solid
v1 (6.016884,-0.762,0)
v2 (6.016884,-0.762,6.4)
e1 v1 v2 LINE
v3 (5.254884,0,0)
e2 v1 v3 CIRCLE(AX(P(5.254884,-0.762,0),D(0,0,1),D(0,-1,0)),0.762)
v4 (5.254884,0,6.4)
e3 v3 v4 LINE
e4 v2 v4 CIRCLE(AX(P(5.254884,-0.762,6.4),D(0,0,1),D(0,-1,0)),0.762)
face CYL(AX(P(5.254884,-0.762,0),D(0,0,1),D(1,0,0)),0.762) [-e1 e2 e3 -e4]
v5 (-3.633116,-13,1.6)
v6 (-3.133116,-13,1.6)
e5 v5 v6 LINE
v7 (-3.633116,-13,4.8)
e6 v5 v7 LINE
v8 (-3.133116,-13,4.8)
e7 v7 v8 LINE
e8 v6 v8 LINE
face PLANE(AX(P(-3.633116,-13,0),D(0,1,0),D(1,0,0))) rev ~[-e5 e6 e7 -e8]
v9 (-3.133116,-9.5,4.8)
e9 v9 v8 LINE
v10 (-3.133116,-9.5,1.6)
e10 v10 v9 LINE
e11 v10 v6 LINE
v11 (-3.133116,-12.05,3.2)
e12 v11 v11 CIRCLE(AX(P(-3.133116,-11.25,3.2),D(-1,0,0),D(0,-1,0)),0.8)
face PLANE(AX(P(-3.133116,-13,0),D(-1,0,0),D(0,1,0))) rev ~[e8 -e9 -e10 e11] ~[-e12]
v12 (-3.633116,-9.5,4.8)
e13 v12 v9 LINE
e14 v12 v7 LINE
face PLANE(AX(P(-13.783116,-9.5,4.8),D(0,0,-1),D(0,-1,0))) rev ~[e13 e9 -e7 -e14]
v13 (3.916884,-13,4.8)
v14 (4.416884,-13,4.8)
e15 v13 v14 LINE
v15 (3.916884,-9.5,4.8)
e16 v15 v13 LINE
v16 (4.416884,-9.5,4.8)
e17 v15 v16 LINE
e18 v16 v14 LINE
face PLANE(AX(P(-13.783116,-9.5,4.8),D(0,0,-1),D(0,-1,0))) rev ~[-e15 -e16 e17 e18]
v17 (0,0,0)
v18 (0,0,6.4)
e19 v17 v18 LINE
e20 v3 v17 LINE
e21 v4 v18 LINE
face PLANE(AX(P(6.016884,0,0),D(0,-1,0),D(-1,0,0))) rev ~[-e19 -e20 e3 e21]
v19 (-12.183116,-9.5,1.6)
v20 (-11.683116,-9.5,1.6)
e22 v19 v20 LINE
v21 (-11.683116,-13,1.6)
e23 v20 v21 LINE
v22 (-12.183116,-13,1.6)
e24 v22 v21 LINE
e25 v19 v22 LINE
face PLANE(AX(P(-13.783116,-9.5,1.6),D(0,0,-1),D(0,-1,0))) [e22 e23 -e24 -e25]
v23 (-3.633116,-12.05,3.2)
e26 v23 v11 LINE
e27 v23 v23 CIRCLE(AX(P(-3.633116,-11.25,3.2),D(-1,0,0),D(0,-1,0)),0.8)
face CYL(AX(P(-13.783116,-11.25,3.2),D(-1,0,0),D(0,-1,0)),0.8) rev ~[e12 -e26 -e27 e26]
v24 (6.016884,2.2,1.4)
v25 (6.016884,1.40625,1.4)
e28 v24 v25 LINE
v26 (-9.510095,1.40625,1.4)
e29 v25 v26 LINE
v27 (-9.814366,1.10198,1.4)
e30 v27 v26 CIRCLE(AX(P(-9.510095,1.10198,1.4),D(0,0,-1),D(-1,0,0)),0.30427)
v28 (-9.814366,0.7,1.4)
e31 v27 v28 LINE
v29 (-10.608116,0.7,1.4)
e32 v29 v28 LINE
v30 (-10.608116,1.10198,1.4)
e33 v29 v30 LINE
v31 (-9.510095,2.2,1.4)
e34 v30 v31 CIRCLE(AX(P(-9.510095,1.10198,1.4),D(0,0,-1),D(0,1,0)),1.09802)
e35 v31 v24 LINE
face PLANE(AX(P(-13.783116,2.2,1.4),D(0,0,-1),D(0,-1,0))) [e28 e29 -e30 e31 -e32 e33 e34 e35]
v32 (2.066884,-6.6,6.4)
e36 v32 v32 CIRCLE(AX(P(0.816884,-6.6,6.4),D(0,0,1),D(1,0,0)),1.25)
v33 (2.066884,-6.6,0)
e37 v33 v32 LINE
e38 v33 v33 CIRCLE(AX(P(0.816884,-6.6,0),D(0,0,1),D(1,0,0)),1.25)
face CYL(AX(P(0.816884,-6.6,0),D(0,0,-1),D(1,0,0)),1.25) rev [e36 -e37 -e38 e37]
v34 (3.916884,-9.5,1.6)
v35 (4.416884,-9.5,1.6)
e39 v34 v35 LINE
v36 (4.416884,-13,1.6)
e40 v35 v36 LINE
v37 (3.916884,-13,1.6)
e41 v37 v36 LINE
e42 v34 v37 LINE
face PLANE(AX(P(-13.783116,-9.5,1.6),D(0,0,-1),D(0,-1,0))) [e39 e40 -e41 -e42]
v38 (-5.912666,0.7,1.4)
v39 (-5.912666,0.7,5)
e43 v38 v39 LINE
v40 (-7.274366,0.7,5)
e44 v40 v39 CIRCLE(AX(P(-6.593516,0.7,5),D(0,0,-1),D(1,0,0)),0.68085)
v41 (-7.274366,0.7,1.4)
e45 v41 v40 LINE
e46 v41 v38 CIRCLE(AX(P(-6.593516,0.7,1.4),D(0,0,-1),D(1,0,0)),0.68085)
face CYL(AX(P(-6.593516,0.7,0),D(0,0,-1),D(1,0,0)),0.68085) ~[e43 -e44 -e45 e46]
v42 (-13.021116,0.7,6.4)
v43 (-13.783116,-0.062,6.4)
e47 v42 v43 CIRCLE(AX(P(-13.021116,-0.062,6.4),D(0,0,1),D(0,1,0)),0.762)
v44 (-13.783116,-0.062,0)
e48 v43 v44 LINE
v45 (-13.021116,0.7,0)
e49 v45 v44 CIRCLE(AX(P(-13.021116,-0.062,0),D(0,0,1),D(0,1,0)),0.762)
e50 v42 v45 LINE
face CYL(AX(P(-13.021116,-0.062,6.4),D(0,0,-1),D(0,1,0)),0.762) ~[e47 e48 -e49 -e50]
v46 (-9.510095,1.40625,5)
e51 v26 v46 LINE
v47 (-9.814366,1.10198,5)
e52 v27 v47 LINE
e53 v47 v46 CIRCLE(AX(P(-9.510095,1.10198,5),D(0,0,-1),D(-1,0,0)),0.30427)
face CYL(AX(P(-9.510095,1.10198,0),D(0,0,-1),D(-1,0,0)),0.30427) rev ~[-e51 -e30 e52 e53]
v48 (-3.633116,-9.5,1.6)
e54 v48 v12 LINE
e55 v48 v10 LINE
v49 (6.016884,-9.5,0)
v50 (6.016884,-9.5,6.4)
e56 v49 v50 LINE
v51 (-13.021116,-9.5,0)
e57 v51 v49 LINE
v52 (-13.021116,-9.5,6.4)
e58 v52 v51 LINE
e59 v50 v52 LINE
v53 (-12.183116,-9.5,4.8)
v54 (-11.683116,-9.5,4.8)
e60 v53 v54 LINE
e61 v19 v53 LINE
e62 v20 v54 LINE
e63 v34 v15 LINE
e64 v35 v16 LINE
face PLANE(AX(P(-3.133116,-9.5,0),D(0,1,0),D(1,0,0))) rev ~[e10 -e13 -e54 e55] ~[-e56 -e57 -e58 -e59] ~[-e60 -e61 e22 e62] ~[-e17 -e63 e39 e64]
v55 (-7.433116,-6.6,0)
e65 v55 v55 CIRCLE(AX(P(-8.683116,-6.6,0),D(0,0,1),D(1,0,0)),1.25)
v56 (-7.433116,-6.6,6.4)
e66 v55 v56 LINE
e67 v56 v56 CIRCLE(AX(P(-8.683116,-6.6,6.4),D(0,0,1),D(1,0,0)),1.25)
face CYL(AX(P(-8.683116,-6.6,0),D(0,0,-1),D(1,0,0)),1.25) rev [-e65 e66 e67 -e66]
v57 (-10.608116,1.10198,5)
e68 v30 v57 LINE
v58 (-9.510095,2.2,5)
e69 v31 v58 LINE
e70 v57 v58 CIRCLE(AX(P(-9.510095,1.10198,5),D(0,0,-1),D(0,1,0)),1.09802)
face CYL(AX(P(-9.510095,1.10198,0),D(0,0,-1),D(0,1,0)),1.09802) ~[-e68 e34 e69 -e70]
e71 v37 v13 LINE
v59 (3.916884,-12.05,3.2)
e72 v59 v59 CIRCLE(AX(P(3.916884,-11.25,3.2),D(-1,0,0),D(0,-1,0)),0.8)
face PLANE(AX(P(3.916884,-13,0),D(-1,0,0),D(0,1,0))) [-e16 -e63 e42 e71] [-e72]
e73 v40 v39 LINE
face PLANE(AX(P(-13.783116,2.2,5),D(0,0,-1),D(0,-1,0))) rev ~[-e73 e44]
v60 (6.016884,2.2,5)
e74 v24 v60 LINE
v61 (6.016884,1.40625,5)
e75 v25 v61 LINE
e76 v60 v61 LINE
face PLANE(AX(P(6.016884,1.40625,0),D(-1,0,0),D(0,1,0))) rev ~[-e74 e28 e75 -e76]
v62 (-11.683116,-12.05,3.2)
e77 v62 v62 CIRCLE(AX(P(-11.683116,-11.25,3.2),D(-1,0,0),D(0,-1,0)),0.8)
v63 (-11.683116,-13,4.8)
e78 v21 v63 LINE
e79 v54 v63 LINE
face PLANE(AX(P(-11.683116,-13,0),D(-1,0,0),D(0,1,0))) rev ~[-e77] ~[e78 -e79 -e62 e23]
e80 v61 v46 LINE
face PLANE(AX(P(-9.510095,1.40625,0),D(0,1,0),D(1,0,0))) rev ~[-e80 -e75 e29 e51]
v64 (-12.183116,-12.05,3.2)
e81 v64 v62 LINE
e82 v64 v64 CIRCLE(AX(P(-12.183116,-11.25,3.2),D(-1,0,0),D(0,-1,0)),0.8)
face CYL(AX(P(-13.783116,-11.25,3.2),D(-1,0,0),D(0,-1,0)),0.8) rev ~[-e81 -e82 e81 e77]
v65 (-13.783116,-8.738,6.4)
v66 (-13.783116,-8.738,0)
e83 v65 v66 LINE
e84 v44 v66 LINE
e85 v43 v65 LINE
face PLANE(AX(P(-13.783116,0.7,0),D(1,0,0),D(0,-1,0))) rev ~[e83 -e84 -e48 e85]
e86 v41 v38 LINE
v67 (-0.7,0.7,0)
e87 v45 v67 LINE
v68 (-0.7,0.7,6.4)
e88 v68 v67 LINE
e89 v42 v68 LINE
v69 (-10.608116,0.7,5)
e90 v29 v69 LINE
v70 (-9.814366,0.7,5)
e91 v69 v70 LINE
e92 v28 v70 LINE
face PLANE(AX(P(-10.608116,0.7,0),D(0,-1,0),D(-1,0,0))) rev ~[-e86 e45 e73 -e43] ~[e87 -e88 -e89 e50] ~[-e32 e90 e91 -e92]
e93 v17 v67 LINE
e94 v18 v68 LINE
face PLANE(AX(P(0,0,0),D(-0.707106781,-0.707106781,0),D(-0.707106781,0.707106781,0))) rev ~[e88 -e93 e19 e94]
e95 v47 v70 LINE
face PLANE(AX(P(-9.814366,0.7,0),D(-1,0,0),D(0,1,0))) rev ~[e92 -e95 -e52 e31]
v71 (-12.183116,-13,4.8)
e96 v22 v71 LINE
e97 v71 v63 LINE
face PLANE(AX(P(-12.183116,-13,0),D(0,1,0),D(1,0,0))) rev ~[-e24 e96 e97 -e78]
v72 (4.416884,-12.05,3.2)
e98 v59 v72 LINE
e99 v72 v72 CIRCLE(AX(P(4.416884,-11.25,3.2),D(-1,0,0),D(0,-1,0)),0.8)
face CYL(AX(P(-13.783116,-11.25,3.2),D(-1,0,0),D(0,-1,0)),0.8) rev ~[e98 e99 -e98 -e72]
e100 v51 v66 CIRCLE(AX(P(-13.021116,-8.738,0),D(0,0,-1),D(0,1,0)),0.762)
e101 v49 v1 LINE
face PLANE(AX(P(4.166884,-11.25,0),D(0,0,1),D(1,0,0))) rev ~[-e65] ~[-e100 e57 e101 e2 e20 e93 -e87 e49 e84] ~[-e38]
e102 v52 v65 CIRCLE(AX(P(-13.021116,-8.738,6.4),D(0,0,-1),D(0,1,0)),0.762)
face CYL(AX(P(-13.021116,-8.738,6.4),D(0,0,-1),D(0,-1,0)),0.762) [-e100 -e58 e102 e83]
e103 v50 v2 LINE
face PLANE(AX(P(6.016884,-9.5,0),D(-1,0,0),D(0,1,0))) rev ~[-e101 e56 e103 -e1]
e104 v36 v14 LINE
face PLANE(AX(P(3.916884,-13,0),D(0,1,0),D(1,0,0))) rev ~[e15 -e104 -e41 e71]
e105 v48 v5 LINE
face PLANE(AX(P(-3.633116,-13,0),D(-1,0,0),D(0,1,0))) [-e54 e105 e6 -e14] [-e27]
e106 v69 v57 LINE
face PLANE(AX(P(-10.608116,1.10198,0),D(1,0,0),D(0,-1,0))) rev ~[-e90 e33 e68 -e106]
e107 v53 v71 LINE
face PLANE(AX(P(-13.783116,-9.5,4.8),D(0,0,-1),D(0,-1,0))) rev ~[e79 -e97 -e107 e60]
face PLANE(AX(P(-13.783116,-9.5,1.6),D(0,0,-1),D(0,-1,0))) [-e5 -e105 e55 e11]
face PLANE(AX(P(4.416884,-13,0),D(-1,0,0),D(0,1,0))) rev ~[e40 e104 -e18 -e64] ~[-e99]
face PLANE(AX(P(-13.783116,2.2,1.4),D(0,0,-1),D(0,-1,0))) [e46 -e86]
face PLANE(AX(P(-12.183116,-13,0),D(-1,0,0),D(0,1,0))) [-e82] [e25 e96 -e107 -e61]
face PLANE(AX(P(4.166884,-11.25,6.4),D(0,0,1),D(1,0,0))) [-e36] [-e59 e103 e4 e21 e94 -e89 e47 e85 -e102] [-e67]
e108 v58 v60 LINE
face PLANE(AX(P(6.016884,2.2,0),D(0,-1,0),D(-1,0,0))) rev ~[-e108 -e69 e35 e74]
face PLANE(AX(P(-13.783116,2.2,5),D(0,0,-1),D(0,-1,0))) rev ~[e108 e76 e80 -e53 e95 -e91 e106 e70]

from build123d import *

# Parameters (mm, degrees)
F0_W     = 0.5
F0_H     = 3.5
F0_R     = 1.25
F1_DEPTH = 6.4
F2_W     = 1.5
F2_H     = 1.4
F2_W_2   = 3.5
F2_H_2   = 1.6
F2_R     = 0.8
F3_DEPTH = 19.8
F4_R     = 0.762


with BuildPart() as f1:
    # F0 (on Top) → F1 (new body)
    with BuildSketch(Plane.XY):
        with Locations((4.1668843009, -11.25)):
            Rectangle(F0_W, F0_H)
        with Locations((-3.3831156991, -11.25)):
            Rectangle(F0_W, F0_H)
        with Locations((-11.9331156991, -11.25)):
            Rectangle(F0_W, F0_H)
        with BuildLine():
            Line((-10.6081156991, 0.7), (-9.8143656991, 0.7))
            Line((-9.8143656991, 0.7), (-9.8143656991, 1.101979753))
            ThreePointArc((-9.8143656991, 1.101979753), (-9.7252470071, 1.317131308), (-9.5100954521, 1.40625))
            Line((-9.5100954521, 1.40625), (6.0168843009, 1.40625))
            Line((6.0168843009, 1.40625), (6.0168843009, 2.2))
            Line((6.0168843009, 2.2), (-9.5100954521, 2.2))
            ThreePointArc((-9.5100954521, 2.2), (-10.2865130147, 1.8783973155), (-10.6081156991, 1.101979753))
            Line((-10.6081156991, 1.101979753), (-10.6081156991, 0.7))
        make_face()
        with BuildLine():
            Line((6.0168843009, 0), (0, 0))
            Line((0, 0), (-0.7, 0.7))
            Line((-0.7, 0.7), (-5.9126656991, 0.7))
            ThreePointArc((-5.9126656991, 0.7), (-6.5935156991, 1.38085), (-7.2743656991, 0.7))
            Line((-7.2743656991, 0.7), (-9.8143656991, 0.7))
            Line((-9.8143656991, 0.7), (-10.6081156991, 0.7))
            Line((-10.6081156991, 0.7), (-13.7831156991, 0.7))
            Line((-13.7831156991, 0.7), (-13.7831156991, -9.5))
            Line((-13.7831156991, -9.5), (-12.1831156991, -9.5))
            Line((-12.1831156991, -9.5), (-11.6831156991, -9.5))
            Line((-11.6831156991, -9.5), (-3.6331156991, -9.5))
            Line((-3.6331156991, -9.5), (-3.1331156991, -9.5))
            Line((-3.1331156991, -9.5), (3.9168843009, -9.5))
            Line((3.9168843009, -9.5), (4.4168843009, -9.5))
            Line((4.4168843009, -9.5), (6.0168843009, -9.5))
            Line((6.0168843009, -9.5), (6.0168843009, 0))
        make_face()
        with Locations((-8.6831156991, -6.6)):
            Circle(F0_R, mode=Mode.SUBTRACT)
        with Locations((0.8168843009, -6.6)):
            Circle(F0_R, mode=Mode.SUBTRACT)
    extrude(amount=F1_DEPTH)

    # F2 (on face) → F3 (cut, through all)
    with BuildSketch(Plane(origin=(-13.7831156991, 0, 0), x_dir=(0, -1, 0), z_dir=(-1, 0, 0))):
        with Locations((-1.45, 0.7)):
            Rectangle(F2_W, F2_H)
        with Locations((-1.45, 5.7)):
            Rectangle(F2_W, F2_H)
        with Locations((11.25, 0.8)):
            Rectangle(F2_W_2, F2_H_2)
        with Locations((11.25, 5.6)):
            Rectangle(F2_W_2, F2_H_2)
        with Locations((11.25, 3.2)):
            Circle(F2_R)
    extrude(amount=-F3_DEPTH, mode=Mode.SUBTRACT)

    # F4
    f4_edges = [f1.edges().sort_by_distance(p)[0] for p in [
        (-13.783116, -9.5, 3.2),
        (6.016884, 0, 3.2),
        (-13.783116, 0.7, 3.2),
    ]]
    fillet(f4_edges, radius=F4_R)


solid = f1.part
